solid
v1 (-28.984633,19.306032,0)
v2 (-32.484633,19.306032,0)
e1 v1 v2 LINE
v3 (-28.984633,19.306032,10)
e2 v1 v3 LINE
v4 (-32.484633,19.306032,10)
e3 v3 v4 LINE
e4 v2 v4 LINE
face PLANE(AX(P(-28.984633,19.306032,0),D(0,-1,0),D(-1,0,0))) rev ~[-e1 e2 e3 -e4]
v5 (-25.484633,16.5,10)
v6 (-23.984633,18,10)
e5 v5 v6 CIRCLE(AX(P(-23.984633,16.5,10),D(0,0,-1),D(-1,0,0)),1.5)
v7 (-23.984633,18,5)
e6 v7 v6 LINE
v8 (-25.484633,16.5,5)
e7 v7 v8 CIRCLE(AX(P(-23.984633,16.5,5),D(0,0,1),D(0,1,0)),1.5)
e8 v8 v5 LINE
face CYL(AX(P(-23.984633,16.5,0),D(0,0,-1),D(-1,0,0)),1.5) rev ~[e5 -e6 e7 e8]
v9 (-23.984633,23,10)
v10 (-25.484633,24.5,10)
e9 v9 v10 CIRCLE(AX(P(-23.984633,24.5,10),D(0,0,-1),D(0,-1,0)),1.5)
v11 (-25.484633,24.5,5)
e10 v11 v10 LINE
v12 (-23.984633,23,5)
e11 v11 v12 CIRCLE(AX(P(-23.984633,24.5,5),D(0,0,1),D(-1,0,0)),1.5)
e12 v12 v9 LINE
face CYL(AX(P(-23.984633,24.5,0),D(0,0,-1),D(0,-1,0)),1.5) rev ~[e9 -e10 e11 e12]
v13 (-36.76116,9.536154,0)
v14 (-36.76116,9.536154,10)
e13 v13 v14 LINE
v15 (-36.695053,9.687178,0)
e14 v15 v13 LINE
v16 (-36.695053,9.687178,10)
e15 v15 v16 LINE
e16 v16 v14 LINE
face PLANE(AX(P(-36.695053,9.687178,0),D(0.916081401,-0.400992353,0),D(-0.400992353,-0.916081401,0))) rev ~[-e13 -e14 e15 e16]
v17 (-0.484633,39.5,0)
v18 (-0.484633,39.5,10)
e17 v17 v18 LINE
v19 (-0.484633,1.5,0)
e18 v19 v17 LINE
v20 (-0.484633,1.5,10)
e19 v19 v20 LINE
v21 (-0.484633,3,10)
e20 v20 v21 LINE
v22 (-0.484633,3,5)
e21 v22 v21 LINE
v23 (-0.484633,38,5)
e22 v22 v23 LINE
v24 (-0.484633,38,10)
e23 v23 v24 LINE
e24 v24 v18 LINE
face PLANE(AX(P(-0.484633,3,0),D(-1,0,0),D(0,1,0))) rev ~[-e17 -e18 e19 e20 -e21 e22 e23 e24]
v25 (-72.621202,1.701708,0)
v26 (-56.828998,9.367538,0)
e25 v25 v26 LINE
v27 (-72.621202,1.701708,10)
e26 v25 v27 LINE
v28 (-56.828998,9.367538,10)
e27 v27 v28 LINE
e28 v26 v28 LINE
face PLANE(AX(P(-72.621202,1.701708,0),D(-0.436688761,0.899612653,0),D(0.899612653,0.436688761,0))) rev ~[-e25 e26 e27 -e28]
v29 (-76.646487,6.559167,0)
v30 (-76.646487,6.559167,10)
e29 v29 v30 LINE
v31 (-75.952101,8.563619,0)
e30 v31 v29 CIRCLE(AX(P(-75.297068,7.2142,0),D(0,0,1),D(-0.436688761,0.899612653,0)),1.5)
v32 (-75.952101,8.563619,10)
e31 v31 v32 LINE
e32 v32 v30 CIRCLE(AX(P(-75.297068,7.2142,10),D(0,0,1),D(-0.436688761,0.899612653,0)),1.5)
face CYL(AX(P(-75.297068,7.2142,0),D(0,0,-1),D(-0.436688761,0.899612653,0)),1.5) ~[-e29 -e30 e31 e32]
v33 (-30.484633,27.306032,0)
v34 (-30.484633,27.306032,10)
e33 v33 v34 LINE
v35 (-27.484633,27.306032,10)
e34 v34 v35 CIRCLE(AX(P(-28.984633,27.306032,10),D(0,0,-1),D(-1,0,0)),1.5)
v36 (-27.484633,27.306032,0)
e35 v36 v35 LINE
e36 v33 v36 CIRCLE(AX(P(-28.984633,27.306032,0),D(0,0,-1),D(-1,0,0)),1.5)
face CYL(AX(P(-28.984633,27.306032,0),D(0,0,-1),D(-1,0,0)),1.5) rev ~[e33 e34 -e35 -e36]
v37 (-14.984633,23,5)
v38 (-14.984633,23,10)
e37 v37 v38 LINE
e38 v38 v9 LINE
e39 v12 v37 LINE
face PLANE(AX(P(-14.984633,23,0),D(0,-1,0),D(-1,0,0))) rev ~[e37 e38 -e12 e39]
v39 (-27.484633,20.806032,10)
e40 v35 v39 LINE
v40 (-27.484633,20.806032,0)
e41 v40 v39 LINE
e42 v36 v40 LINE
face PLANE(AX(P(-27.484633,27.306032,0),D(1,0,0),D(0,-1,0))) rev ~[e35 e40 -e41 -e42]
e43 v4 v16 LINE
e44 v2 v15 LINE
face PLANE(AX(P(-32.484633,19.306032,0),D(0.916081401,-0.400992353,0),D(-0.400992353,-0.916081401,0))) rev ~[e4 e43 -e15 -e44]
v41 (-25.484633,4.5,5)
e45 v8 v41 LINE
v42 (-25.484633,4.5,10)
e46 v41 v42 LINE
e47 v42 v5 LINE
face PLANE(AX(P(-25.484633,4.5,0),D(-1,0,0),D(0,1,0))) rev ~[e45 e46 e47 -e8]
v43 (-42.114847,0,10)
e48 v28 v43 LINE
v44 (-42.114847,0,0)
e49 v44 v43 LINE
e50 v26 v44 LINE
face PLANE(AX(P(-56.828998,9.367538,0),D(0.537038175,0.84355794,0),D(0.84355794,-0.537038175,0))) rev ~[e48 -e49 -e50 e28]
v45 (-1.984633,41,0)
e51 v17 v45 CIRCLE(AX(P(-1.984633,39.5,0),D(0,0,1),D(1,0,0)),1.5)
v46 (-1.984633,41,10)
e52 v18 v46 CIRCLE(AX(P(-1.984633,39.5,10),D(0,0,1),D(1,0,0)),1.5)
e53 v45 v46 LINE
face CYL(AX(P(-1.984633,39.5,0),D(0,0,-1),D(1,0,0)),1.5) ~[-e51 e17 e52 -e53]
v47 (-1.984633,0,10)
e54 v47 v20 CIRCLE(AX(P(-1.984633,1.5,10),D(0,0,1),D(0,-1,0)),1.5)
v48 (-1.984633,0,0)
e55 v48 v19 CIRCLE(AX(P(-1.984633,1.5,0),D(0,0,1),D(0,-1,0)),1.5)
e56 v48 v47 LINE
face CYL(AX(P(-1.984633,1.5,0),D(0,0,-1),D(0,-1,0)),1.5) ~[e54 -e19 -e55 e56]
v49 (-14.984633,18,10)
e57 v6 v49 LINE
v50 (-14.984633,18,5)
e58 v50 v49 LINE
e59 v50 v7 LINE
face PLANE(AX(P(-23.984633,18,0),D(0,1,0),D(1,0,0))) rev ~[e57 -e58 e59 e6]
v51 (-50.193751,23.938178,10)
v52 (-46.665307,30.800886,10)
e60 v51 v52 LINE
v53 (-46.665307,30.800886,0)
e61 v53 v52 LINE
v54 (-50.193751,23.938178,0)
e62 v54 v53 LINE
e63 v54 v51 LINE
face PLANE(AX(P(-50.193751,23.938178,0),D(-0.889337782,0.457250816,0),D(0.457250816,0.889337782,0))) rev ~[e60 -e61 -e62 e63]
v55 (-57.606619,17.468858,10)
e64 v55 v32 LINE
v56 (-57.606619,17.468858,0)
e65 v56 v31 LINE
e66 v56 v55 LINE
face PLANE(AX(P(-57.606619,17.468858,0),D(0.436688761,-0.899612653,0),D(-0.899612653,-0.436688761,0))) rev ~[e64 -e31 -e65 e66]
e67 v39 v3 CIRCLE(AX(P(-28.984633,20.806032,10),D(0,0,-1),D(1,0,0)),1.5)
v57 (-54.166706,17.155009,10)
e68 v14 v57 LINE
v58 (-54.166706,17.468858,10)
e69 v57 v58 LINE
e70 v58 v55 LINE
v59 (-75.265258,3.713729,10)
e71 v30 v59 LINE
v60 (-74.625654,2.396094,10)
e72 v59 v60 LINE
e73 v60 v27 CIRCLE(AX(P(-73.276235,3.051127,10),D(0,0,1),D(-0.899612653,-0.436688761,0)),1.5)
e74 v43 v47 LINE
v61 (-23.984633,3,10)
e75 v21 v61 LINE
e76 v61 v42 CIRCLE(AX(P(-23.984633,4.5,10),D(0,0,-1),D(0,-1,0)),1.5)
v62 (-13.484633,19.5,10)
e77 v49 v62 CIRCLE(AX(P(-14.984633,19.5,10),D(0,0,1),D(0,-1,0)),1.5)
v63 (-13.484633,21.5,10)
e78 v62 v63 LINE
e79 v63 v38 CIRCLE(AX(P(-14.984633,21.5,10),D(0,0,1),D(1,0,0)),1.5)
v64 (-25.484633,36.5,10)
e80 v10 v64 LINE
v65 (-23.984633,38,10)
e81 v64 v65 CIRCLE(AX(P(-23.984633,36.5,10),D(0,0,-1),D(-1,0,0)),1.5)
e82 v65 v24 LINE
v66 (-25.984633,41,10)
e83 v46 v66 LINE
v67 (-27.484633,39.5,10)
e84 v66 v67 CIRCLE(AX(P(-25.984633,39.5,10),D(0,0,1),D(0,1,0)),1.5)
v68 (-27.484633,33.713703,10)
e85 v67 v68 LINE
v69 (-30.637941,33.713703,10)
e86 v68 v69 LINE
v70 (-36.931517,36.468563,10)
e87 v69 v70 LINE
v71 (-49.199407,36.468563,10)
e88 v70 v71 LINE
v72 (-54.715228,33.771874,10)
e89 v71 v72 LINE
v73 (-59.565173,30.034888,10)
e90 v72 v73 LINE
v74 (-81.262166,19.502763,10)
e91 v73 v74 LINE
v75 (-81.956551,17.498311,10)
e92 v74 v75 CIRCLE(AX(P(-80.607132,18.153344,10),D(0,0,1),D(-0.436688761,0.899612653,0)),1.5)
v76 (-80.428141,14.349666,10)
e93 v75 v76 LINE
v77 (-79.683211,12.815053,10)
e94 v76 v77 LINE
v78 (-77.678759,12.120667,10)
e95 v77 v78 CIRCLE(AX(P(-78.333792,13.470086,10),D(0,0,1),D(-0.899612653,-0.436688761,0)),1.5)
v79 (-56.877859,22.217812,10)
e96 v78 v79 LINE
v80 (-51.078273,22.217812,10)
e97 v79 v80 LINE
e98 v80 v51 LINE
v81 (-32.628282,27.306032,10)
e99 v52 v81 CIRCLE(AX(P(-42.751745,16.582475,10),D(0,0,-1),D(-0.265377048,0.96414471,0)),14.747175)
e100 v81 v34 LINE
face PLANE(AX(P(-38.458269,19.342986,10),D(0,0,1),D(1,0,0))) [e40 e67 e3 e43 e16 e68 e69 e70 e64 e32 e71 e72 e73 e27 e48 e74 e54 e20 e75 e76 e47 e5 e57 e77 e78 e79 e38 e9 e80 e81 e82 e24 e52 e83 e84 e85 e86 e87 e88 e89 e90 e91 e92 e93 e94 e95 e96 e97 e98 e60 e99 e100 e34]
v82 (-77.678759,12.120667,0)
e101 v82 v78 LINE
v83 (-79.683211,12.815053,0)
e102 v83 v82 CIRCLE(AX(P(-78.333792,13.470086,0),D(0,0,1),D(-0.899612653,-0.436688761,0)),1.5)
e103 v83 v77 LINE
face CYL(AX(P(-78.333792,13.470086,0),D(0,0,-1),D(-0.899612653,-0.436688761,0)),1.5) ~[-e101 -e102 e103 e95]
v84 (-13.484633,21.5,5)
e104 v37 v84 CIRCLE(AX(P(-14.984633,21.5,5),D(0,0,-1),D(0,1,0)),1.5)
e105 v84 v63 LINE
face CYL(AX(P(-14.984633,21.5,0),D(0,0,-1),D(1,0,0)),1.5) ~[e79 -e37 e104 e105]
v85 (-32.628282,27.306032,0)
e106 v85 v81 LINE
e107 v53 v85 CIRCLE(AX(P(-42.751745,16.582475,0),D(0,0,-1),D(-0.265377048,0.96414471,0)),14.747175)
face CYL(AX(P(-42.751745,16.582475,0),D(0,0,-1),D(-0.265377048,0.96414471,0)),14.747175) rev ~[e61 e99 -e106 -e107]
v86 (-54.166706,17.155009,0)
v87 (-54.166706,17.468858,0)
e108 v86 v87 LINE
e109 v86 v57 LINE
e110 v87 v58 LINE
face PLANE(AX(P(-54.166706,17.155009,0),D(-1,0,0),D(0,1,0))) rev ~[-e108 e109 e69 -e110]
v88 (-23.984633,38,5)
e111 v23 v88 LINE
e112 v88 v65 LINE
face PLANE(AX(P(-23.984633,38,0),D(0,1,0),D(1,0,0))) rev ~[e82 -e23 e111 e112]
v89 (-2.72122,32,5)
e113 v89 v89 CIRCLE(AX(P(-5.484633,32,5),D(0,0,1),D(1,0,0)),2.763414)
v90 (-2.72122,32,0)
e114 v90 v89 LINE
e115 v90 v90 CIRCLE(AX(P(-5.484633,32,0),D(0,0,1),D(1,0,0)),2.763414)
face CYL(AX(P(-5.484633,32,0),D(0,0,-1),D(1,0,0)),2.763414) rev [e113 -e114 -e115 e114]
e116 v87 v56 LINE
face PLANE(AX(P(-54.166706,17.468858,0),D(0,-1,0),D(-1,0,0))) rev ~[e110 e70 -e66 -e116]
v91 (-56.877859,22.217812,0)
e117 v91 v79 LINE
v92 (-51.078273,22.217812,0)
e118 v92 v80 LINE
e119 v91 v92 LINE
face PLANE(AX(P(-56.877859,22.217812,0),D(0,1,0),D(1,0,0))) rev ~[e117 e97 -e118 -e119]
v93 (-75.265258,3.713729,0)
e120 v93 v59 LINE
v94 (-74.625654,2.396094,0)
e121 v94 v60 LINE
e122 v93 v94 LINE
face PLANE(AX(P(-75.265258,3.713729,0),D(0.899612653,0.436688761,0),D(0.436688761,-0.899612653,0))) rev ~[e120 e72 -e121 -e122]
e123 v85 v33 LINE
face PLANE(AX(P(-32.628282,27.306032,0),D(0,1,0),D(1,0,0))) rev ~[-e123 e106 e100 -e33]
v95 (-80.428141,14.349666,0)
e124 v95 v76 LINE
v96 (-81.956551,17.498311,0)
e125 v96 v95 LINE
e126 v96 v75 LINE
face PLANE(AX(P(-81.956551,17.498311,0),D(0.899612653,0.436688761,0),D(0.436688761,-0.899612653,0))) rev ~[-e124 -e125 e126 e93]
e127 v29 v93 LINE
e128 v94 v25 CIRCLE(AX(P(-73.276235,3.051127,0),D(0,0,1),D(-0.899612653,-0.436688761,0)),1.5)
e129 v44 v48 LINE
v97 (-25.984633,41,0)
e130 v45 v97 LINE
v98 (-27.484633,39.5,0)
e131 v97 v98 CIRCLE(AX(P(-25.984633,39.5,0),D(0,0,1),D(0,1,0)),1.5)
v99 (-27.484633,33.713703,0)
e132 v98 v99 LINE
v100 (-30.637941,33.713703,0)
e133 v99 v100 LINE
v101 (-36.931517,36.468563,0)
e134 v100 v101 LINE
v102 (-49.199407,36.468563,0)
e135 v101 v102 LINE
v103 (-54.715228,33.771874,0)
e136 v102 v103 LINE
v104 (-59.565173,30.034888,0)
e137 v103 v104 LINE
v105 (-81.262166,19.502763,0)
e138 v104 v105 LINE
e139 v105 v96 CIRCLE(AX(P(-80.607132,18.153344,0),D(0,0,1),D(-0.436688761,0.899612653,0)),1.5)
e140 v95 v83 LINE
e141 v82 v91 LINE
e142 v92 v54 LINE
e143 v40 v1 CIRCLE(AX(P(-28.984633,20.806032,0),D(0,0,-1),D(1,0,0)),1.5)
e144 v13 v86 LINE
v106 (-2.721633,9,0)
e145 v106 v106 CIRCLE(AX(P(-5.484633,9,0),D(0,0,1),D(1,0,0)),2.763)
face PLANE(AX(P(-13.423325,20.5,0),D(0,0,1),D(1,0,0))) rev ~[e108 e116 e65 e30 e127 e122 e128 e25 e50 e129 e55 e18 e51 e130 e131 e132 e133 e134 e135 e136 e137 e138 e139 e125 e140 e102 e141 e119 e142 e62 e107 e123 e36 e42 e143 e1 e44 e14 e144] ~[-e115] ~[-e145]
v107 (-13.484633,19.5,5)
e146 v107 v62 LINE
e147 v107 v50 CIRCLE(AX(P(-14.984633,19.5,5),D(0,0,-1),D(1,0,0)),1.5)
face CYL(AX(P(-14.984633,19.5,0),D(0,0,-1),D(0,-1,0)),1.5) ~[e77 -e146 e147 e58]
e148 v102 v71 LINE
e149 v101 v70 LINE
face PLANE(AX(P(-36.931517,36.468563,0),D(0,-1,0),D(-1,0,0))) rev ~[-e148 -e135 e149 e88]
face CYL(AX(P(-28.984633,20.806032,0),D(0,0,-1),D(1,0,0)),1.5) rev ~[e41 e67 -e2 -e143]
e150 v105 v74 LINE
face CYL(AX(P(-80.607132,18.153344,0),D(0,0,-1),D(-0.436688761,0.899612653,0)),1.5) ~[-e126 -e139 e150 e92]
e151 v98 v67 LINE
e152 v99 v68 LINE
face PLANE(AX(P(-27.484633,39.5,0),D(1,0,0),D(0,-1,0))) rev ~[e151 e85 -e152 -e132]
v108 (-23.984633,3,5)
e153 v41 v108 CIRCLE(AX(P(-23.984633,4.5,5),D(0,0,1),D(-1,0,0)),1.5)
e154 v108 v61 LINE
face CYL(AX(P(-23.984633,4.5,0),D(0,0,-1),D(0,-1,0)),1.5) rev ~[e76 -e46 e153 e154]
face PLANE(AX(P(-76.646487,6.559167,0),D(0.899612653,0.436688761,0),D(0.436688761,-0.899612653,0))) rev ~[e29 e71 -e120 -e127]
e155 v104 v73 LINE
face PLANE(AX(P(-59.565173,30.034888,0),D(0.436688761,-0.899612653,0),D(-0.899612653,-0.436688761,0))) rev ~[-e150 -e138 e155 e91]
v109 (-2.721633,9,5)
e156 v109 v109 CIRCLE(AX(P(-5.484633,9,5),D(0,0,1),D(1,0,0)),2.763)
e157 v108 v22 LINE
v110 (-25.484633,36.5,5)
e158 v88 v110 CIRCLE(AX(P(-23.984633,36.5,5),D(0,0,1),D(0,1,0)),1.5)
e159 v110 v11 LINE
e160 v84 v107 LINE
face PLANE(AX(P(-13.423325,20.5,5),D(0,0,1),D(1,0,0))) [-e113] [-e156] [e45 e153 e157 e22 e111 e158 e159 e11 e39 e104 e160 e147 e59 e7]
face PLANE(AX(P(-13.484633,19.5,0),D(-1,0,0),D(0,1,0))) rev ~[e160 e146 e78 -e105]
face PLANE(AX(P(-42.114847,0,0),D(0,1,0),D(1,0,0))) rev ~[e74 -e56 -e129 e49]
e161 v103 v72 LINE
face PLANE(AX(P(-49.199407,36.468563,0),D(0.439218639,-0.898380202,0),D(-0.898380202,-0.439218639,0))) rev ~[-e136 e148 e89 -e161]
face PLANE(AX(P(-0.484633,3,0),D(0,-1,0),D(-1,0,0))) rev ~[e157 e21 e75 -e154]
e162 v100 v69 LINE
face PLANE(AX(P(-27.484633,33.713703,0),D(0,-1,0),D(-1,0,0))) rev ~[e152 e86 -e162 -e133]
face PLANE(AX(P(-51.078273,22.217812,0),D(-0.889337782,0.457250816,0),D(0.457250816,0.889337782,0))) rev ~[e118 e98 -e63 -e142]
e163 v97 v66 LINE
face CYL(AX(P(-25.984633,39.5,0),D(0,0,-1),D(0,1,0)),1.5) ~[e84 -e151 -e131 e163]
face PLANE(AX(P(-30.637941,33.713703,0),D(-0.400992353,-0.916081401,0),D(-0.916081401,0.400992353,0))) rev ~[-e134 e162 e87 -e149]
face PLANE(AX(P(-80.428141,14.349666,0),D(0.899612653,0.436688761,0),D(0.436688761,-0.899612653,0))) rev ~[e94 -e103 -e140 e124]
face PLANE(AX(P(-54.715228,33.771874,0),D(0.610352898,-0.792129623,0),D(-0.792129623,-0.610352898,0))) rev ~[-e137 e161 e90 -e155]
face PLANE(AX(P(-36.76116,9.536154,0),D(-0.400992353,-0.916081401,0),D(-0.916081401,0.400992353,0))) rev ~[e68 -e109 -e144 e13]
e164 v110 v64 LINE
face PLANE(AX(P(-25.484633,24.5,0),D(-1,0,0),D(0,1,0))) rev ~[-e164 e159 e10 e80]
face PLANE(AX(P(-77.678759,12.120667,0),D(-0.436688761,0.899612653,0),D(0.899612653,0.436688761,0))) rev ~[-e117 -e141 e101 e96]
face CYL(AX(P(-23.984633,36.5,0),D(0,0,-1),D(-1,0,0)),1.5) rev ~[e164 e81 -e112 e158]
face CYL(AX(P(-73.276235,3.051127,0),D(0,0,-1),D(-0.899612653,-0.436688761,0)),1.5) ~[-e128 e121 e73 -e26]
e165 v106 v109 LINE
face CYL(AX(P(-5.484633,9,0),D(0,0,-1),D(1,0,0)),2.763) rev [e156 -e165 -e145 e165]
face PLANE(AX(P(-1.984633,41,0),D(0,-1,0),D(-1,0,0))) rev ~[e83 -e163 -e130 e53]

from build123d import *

# Parameters (mm, degrees)
F1_DEPTH = 10
F0_R     = 2.763
F0_R_2   = 2.7634135205
F2_DEPTH = 5


# Not quite as in the source:
# - a feature names something its author has since deleted; it is built from what else it names


with BuildPart() as f1:
    # F0 (on Top) → F1 (new body)
    with BuildSketch(Plane.XY):
        with BuildLine():
            Line((-28.9846330285, 19.3060322961), (-32.4846330285, 19.3060322961))
            Line((-32.4846330285, 19.3060322961), (-36.6950527355, 9.6871775882))
            Line((-36.6950527355, 9.6871775882), (-36.7611596752, 9.5361539153))
            Line((-36.7611596752, 9.5361539153), (-54.1667062895, 17.1550086232))
            Line((-54.1667062895, 17.1550086232), (-54.1667062895, 17.4688580502))
            Line((-54.1667062895, 17.4688580502), (-57.6066188446, 17.4688580502))
            Line((-57.6066188446, 17.4688580502), (-75.9521011029, 8.5636187846))
            ThreePointArc((-75.9521011029, 8.5636187846), (-76.7144296488, 7.7052047395), (-76.6464869407, 6.5591666629))
            Line((-76.6464869407, 6.5591666629), (-75.2652584401, 3.7137290281))
            Line((-75.2652584401, 3.7137290281), (-74.6256538324, 2.3960940233))
            ThreePointArc((-74.6256538324, 2.3960940233), (-73.7672397873, 1.6337654774), (-72.6212017107, 1.7017081855))
            Line((-72.6212017107, 1.7017081855), (-56.8289984312, 9.3675382114))
            Line((-56.8289984312, 9.3675382114), (-42.1148466106, 0))
            Line((-42.1148466106, 0), (-28.5, 0))
            Line((-28.5, 0), (-18.5, 0))
            Line((-18.5, 0), (-1.9846330285, 0))
            ThreePointArc((-1.9846330285, 0), (-0.9239728567, 0.4393398282), (-0.4846330285, 1.5))
            Line((-0.4846330285, 1.5), (-0.4846330285, 3))
            Line((-0.4846330285, 3), (-23.9846330285, 3))
            ThreePointArc((-23.9846330285, 3), (-25.0452932003, 3.4393398282), (-25.4846330285, 4.5))
            Line((-25.4846330285, 4.5), (-25.4846330285, 16.5))
            ThreePointArc((-25.4846330285, 16.5), (-25.0452932003, 17.5606601718), (-23.9846330285, 18))
            Line((-23.9846330285, 18), (-14.9846330285, 18))
            ThreePointArc((-14.9846330285, 18), (-13.9239728567, 18.4393398282), (-13.4846330285, 19.5))
            Line((-13.4846330285, 19.5), (-13.4846330285, 21.5))
            ThreePointArc((-13.4846330285, 21.5), (-13.9239728567, 22.5606601718), (-14.9846330285, 23))
            Line((-14.9846330285, 23), (-23.9846330285, 23))
            ThreePointArc((-23.9846330285, 23), (-25.0452932003, 23.4393398282), (-25.4846330285, 24.5))
            Line((-25.4846330285, 24.5), (-25.4846330285, 36.5))
            ThreePointArc((-25.4846330285, 36.5), (-25.0452932003, 37.5606601718), (-23.9846330285, 38))
            Line((-23.9846330285, 38), (-0.4846330285, 38))
            Line((-0.4846330285, 38), (-0.4846330285, 39.5))
            ThreePointArc((-0.4846330285, 39.5), (-0.9239728567, 40.5606601718), (-1.9846330285, 41))
            Line((-1.9846330285, 41), (-25.4846330285, 41))
            Line((-25.4846330285, 41), (-25.9846330285, 41))
            ThreePointArc((-25.9846330285, 41), (-27.0452932003, 40.5606601718), (-27.4846330285, 39.5))
            Line((-27.4846330285, 39.5), (-27.4846330285, 39.3057436331))
            Line((-27.4846330285, 39.3057436331), (-27.4846330285, 33.7137029542))
            Line((-27.4846330285, 33.7137029542), (-30.6379412534, 33.7137029542))
            Line((-30.6379412534, 33.7137029542), (-36.9315167422, 36.4685625576))
            Line((-36.9315167422, 36.4685625576), (-49.1994071018, 36.4685625576))
            Line((-49.1994071018, 36.4685625576), (-54.7152283086, 33.7718741409))
            Line((-54.7152283086, 33.7718741409), (-59.5651725871, 30.0348878412))
            Line((-59.5651725871, 30.0348878412), (-81.2621656129, 19.502762737))
            ThreePointArc((-81.2621656129, 19.502762737), (-82.0244941588, 18.6443486919), (-81.9565514507, 17.4983106153))
            Line((-81.9565514507, 17.4983106153), (-80.4281407861, 14.3496663292))
            Line((-80.4281407861, 14.3496663292), (-79.683210987, 12.8150532767))
            ThreePointArc((-79.683210987, 12.8150532767), (-78.8247969419, 12.0527247308), (-77.6787588653, 12.1206674389))
            Line((-77.6787588653, 12.1206674389), (-56.8778590157, 22.2178122015))
            Line((-56.8778590157, 22.2178122015), (-51.0782729994, 22.2178122015))
            Line((-51.0782729994, 22.2178122015), (-50.1937510157, 23.9381783364))
            Line((-50.1937510157, 23.9381783364), (-46.6653068671, 30.8008860291))
            ThreePointArc((-46.6653068671, 30.8008860291), (-39.1888505002, 30.8927845811), (-32.6282824459, 27.3060322961))
            Line((-32.6282824459, 27.3060322961), (-30.4846330285, 27.3060322961))
            ThreePointArc((-30.4846330285, 27.3060322961), (-28.9846330285, 28.8060322961), (-27.4846330285, 27.3060322961))
            Line((-27.4846330285, 27.3060322961), (-27.4846330285, 20.8060322961))
            ThreePointArc((-27.4846330285, 20.8060322961), (-27.9239728567, 19.7453721243), (-28.9846330285, 19.3060322961))
        make_face()
    extrude(amount=F1_DEPTH)

    # F0 (on Top) → F2 (join)
    with BuildSketch(Plane.XY):
        with BuildLine():
            Line((-23.9846330285, 3), (-0.4846330285, 3))
            Line((-0.4846330285, 3), (-0.4846330285, 3.0459866499))
            Line((-0.4846330285, 3.0459866499), (-0.4846330285, 37.9540133501))
            Line((-0.4846330285, 37.9540133501), (-0.4846330285, 38))
            Line((-0.4846330285, 38), (-23.9846330285, 38))
            ThreePointArc((-23.9846330285, 38), (-25.0452932003, 37.5606601718), (-25.4846330285, 36.5))
            Line((-25.4846330285, 36.5), (-25.4846330285, 24.5))
            ThreePointArc((-25.4846330285, 24.5), (-25.0452932003, 23.4393398282), (-23.9846330285, 23))
            Line((-23.9846330285, 23), (-14.9846330285, 23))
            ThreePointArc((-14.9846330285, 23), (-13.9239728567, 22.5606601718), (-13.4846330285, 21.5))
            Line((-13.4846330285, 21.5), (-13.4846330285, 19.5))
            ThreePointArc((-13.4846330285, 19.5), (-13.9239728567, 18.4393398282), (-14.9846330285, 18))
            Line((-14.9846330285, 18), (-23.9846330285, 18))
            ThreePointArc((-23.9846330285, 18), (-25.0452932003, 17.5606601718), (-25.4846330285, 16.5))
            Line((-25.4846330285, 16.5), (-25.4846330285, 4.5))
            ThreePointArc((-25.4846330285, 4.5), (-25.0452932003, 3.4393398282), (-23.9846330285, 3))
        make_face()
        with Locations((-5.4846330285, 9)):
            Circle(F0_R, mode=Mode.SUBTRACT)
        with Locations((-5.4846330285, 32)):
            Circle(F0_R_2, mode=Mode.SUBTRACT)
    extrude(amount=F2_DEPTH)


solid = f1.part
